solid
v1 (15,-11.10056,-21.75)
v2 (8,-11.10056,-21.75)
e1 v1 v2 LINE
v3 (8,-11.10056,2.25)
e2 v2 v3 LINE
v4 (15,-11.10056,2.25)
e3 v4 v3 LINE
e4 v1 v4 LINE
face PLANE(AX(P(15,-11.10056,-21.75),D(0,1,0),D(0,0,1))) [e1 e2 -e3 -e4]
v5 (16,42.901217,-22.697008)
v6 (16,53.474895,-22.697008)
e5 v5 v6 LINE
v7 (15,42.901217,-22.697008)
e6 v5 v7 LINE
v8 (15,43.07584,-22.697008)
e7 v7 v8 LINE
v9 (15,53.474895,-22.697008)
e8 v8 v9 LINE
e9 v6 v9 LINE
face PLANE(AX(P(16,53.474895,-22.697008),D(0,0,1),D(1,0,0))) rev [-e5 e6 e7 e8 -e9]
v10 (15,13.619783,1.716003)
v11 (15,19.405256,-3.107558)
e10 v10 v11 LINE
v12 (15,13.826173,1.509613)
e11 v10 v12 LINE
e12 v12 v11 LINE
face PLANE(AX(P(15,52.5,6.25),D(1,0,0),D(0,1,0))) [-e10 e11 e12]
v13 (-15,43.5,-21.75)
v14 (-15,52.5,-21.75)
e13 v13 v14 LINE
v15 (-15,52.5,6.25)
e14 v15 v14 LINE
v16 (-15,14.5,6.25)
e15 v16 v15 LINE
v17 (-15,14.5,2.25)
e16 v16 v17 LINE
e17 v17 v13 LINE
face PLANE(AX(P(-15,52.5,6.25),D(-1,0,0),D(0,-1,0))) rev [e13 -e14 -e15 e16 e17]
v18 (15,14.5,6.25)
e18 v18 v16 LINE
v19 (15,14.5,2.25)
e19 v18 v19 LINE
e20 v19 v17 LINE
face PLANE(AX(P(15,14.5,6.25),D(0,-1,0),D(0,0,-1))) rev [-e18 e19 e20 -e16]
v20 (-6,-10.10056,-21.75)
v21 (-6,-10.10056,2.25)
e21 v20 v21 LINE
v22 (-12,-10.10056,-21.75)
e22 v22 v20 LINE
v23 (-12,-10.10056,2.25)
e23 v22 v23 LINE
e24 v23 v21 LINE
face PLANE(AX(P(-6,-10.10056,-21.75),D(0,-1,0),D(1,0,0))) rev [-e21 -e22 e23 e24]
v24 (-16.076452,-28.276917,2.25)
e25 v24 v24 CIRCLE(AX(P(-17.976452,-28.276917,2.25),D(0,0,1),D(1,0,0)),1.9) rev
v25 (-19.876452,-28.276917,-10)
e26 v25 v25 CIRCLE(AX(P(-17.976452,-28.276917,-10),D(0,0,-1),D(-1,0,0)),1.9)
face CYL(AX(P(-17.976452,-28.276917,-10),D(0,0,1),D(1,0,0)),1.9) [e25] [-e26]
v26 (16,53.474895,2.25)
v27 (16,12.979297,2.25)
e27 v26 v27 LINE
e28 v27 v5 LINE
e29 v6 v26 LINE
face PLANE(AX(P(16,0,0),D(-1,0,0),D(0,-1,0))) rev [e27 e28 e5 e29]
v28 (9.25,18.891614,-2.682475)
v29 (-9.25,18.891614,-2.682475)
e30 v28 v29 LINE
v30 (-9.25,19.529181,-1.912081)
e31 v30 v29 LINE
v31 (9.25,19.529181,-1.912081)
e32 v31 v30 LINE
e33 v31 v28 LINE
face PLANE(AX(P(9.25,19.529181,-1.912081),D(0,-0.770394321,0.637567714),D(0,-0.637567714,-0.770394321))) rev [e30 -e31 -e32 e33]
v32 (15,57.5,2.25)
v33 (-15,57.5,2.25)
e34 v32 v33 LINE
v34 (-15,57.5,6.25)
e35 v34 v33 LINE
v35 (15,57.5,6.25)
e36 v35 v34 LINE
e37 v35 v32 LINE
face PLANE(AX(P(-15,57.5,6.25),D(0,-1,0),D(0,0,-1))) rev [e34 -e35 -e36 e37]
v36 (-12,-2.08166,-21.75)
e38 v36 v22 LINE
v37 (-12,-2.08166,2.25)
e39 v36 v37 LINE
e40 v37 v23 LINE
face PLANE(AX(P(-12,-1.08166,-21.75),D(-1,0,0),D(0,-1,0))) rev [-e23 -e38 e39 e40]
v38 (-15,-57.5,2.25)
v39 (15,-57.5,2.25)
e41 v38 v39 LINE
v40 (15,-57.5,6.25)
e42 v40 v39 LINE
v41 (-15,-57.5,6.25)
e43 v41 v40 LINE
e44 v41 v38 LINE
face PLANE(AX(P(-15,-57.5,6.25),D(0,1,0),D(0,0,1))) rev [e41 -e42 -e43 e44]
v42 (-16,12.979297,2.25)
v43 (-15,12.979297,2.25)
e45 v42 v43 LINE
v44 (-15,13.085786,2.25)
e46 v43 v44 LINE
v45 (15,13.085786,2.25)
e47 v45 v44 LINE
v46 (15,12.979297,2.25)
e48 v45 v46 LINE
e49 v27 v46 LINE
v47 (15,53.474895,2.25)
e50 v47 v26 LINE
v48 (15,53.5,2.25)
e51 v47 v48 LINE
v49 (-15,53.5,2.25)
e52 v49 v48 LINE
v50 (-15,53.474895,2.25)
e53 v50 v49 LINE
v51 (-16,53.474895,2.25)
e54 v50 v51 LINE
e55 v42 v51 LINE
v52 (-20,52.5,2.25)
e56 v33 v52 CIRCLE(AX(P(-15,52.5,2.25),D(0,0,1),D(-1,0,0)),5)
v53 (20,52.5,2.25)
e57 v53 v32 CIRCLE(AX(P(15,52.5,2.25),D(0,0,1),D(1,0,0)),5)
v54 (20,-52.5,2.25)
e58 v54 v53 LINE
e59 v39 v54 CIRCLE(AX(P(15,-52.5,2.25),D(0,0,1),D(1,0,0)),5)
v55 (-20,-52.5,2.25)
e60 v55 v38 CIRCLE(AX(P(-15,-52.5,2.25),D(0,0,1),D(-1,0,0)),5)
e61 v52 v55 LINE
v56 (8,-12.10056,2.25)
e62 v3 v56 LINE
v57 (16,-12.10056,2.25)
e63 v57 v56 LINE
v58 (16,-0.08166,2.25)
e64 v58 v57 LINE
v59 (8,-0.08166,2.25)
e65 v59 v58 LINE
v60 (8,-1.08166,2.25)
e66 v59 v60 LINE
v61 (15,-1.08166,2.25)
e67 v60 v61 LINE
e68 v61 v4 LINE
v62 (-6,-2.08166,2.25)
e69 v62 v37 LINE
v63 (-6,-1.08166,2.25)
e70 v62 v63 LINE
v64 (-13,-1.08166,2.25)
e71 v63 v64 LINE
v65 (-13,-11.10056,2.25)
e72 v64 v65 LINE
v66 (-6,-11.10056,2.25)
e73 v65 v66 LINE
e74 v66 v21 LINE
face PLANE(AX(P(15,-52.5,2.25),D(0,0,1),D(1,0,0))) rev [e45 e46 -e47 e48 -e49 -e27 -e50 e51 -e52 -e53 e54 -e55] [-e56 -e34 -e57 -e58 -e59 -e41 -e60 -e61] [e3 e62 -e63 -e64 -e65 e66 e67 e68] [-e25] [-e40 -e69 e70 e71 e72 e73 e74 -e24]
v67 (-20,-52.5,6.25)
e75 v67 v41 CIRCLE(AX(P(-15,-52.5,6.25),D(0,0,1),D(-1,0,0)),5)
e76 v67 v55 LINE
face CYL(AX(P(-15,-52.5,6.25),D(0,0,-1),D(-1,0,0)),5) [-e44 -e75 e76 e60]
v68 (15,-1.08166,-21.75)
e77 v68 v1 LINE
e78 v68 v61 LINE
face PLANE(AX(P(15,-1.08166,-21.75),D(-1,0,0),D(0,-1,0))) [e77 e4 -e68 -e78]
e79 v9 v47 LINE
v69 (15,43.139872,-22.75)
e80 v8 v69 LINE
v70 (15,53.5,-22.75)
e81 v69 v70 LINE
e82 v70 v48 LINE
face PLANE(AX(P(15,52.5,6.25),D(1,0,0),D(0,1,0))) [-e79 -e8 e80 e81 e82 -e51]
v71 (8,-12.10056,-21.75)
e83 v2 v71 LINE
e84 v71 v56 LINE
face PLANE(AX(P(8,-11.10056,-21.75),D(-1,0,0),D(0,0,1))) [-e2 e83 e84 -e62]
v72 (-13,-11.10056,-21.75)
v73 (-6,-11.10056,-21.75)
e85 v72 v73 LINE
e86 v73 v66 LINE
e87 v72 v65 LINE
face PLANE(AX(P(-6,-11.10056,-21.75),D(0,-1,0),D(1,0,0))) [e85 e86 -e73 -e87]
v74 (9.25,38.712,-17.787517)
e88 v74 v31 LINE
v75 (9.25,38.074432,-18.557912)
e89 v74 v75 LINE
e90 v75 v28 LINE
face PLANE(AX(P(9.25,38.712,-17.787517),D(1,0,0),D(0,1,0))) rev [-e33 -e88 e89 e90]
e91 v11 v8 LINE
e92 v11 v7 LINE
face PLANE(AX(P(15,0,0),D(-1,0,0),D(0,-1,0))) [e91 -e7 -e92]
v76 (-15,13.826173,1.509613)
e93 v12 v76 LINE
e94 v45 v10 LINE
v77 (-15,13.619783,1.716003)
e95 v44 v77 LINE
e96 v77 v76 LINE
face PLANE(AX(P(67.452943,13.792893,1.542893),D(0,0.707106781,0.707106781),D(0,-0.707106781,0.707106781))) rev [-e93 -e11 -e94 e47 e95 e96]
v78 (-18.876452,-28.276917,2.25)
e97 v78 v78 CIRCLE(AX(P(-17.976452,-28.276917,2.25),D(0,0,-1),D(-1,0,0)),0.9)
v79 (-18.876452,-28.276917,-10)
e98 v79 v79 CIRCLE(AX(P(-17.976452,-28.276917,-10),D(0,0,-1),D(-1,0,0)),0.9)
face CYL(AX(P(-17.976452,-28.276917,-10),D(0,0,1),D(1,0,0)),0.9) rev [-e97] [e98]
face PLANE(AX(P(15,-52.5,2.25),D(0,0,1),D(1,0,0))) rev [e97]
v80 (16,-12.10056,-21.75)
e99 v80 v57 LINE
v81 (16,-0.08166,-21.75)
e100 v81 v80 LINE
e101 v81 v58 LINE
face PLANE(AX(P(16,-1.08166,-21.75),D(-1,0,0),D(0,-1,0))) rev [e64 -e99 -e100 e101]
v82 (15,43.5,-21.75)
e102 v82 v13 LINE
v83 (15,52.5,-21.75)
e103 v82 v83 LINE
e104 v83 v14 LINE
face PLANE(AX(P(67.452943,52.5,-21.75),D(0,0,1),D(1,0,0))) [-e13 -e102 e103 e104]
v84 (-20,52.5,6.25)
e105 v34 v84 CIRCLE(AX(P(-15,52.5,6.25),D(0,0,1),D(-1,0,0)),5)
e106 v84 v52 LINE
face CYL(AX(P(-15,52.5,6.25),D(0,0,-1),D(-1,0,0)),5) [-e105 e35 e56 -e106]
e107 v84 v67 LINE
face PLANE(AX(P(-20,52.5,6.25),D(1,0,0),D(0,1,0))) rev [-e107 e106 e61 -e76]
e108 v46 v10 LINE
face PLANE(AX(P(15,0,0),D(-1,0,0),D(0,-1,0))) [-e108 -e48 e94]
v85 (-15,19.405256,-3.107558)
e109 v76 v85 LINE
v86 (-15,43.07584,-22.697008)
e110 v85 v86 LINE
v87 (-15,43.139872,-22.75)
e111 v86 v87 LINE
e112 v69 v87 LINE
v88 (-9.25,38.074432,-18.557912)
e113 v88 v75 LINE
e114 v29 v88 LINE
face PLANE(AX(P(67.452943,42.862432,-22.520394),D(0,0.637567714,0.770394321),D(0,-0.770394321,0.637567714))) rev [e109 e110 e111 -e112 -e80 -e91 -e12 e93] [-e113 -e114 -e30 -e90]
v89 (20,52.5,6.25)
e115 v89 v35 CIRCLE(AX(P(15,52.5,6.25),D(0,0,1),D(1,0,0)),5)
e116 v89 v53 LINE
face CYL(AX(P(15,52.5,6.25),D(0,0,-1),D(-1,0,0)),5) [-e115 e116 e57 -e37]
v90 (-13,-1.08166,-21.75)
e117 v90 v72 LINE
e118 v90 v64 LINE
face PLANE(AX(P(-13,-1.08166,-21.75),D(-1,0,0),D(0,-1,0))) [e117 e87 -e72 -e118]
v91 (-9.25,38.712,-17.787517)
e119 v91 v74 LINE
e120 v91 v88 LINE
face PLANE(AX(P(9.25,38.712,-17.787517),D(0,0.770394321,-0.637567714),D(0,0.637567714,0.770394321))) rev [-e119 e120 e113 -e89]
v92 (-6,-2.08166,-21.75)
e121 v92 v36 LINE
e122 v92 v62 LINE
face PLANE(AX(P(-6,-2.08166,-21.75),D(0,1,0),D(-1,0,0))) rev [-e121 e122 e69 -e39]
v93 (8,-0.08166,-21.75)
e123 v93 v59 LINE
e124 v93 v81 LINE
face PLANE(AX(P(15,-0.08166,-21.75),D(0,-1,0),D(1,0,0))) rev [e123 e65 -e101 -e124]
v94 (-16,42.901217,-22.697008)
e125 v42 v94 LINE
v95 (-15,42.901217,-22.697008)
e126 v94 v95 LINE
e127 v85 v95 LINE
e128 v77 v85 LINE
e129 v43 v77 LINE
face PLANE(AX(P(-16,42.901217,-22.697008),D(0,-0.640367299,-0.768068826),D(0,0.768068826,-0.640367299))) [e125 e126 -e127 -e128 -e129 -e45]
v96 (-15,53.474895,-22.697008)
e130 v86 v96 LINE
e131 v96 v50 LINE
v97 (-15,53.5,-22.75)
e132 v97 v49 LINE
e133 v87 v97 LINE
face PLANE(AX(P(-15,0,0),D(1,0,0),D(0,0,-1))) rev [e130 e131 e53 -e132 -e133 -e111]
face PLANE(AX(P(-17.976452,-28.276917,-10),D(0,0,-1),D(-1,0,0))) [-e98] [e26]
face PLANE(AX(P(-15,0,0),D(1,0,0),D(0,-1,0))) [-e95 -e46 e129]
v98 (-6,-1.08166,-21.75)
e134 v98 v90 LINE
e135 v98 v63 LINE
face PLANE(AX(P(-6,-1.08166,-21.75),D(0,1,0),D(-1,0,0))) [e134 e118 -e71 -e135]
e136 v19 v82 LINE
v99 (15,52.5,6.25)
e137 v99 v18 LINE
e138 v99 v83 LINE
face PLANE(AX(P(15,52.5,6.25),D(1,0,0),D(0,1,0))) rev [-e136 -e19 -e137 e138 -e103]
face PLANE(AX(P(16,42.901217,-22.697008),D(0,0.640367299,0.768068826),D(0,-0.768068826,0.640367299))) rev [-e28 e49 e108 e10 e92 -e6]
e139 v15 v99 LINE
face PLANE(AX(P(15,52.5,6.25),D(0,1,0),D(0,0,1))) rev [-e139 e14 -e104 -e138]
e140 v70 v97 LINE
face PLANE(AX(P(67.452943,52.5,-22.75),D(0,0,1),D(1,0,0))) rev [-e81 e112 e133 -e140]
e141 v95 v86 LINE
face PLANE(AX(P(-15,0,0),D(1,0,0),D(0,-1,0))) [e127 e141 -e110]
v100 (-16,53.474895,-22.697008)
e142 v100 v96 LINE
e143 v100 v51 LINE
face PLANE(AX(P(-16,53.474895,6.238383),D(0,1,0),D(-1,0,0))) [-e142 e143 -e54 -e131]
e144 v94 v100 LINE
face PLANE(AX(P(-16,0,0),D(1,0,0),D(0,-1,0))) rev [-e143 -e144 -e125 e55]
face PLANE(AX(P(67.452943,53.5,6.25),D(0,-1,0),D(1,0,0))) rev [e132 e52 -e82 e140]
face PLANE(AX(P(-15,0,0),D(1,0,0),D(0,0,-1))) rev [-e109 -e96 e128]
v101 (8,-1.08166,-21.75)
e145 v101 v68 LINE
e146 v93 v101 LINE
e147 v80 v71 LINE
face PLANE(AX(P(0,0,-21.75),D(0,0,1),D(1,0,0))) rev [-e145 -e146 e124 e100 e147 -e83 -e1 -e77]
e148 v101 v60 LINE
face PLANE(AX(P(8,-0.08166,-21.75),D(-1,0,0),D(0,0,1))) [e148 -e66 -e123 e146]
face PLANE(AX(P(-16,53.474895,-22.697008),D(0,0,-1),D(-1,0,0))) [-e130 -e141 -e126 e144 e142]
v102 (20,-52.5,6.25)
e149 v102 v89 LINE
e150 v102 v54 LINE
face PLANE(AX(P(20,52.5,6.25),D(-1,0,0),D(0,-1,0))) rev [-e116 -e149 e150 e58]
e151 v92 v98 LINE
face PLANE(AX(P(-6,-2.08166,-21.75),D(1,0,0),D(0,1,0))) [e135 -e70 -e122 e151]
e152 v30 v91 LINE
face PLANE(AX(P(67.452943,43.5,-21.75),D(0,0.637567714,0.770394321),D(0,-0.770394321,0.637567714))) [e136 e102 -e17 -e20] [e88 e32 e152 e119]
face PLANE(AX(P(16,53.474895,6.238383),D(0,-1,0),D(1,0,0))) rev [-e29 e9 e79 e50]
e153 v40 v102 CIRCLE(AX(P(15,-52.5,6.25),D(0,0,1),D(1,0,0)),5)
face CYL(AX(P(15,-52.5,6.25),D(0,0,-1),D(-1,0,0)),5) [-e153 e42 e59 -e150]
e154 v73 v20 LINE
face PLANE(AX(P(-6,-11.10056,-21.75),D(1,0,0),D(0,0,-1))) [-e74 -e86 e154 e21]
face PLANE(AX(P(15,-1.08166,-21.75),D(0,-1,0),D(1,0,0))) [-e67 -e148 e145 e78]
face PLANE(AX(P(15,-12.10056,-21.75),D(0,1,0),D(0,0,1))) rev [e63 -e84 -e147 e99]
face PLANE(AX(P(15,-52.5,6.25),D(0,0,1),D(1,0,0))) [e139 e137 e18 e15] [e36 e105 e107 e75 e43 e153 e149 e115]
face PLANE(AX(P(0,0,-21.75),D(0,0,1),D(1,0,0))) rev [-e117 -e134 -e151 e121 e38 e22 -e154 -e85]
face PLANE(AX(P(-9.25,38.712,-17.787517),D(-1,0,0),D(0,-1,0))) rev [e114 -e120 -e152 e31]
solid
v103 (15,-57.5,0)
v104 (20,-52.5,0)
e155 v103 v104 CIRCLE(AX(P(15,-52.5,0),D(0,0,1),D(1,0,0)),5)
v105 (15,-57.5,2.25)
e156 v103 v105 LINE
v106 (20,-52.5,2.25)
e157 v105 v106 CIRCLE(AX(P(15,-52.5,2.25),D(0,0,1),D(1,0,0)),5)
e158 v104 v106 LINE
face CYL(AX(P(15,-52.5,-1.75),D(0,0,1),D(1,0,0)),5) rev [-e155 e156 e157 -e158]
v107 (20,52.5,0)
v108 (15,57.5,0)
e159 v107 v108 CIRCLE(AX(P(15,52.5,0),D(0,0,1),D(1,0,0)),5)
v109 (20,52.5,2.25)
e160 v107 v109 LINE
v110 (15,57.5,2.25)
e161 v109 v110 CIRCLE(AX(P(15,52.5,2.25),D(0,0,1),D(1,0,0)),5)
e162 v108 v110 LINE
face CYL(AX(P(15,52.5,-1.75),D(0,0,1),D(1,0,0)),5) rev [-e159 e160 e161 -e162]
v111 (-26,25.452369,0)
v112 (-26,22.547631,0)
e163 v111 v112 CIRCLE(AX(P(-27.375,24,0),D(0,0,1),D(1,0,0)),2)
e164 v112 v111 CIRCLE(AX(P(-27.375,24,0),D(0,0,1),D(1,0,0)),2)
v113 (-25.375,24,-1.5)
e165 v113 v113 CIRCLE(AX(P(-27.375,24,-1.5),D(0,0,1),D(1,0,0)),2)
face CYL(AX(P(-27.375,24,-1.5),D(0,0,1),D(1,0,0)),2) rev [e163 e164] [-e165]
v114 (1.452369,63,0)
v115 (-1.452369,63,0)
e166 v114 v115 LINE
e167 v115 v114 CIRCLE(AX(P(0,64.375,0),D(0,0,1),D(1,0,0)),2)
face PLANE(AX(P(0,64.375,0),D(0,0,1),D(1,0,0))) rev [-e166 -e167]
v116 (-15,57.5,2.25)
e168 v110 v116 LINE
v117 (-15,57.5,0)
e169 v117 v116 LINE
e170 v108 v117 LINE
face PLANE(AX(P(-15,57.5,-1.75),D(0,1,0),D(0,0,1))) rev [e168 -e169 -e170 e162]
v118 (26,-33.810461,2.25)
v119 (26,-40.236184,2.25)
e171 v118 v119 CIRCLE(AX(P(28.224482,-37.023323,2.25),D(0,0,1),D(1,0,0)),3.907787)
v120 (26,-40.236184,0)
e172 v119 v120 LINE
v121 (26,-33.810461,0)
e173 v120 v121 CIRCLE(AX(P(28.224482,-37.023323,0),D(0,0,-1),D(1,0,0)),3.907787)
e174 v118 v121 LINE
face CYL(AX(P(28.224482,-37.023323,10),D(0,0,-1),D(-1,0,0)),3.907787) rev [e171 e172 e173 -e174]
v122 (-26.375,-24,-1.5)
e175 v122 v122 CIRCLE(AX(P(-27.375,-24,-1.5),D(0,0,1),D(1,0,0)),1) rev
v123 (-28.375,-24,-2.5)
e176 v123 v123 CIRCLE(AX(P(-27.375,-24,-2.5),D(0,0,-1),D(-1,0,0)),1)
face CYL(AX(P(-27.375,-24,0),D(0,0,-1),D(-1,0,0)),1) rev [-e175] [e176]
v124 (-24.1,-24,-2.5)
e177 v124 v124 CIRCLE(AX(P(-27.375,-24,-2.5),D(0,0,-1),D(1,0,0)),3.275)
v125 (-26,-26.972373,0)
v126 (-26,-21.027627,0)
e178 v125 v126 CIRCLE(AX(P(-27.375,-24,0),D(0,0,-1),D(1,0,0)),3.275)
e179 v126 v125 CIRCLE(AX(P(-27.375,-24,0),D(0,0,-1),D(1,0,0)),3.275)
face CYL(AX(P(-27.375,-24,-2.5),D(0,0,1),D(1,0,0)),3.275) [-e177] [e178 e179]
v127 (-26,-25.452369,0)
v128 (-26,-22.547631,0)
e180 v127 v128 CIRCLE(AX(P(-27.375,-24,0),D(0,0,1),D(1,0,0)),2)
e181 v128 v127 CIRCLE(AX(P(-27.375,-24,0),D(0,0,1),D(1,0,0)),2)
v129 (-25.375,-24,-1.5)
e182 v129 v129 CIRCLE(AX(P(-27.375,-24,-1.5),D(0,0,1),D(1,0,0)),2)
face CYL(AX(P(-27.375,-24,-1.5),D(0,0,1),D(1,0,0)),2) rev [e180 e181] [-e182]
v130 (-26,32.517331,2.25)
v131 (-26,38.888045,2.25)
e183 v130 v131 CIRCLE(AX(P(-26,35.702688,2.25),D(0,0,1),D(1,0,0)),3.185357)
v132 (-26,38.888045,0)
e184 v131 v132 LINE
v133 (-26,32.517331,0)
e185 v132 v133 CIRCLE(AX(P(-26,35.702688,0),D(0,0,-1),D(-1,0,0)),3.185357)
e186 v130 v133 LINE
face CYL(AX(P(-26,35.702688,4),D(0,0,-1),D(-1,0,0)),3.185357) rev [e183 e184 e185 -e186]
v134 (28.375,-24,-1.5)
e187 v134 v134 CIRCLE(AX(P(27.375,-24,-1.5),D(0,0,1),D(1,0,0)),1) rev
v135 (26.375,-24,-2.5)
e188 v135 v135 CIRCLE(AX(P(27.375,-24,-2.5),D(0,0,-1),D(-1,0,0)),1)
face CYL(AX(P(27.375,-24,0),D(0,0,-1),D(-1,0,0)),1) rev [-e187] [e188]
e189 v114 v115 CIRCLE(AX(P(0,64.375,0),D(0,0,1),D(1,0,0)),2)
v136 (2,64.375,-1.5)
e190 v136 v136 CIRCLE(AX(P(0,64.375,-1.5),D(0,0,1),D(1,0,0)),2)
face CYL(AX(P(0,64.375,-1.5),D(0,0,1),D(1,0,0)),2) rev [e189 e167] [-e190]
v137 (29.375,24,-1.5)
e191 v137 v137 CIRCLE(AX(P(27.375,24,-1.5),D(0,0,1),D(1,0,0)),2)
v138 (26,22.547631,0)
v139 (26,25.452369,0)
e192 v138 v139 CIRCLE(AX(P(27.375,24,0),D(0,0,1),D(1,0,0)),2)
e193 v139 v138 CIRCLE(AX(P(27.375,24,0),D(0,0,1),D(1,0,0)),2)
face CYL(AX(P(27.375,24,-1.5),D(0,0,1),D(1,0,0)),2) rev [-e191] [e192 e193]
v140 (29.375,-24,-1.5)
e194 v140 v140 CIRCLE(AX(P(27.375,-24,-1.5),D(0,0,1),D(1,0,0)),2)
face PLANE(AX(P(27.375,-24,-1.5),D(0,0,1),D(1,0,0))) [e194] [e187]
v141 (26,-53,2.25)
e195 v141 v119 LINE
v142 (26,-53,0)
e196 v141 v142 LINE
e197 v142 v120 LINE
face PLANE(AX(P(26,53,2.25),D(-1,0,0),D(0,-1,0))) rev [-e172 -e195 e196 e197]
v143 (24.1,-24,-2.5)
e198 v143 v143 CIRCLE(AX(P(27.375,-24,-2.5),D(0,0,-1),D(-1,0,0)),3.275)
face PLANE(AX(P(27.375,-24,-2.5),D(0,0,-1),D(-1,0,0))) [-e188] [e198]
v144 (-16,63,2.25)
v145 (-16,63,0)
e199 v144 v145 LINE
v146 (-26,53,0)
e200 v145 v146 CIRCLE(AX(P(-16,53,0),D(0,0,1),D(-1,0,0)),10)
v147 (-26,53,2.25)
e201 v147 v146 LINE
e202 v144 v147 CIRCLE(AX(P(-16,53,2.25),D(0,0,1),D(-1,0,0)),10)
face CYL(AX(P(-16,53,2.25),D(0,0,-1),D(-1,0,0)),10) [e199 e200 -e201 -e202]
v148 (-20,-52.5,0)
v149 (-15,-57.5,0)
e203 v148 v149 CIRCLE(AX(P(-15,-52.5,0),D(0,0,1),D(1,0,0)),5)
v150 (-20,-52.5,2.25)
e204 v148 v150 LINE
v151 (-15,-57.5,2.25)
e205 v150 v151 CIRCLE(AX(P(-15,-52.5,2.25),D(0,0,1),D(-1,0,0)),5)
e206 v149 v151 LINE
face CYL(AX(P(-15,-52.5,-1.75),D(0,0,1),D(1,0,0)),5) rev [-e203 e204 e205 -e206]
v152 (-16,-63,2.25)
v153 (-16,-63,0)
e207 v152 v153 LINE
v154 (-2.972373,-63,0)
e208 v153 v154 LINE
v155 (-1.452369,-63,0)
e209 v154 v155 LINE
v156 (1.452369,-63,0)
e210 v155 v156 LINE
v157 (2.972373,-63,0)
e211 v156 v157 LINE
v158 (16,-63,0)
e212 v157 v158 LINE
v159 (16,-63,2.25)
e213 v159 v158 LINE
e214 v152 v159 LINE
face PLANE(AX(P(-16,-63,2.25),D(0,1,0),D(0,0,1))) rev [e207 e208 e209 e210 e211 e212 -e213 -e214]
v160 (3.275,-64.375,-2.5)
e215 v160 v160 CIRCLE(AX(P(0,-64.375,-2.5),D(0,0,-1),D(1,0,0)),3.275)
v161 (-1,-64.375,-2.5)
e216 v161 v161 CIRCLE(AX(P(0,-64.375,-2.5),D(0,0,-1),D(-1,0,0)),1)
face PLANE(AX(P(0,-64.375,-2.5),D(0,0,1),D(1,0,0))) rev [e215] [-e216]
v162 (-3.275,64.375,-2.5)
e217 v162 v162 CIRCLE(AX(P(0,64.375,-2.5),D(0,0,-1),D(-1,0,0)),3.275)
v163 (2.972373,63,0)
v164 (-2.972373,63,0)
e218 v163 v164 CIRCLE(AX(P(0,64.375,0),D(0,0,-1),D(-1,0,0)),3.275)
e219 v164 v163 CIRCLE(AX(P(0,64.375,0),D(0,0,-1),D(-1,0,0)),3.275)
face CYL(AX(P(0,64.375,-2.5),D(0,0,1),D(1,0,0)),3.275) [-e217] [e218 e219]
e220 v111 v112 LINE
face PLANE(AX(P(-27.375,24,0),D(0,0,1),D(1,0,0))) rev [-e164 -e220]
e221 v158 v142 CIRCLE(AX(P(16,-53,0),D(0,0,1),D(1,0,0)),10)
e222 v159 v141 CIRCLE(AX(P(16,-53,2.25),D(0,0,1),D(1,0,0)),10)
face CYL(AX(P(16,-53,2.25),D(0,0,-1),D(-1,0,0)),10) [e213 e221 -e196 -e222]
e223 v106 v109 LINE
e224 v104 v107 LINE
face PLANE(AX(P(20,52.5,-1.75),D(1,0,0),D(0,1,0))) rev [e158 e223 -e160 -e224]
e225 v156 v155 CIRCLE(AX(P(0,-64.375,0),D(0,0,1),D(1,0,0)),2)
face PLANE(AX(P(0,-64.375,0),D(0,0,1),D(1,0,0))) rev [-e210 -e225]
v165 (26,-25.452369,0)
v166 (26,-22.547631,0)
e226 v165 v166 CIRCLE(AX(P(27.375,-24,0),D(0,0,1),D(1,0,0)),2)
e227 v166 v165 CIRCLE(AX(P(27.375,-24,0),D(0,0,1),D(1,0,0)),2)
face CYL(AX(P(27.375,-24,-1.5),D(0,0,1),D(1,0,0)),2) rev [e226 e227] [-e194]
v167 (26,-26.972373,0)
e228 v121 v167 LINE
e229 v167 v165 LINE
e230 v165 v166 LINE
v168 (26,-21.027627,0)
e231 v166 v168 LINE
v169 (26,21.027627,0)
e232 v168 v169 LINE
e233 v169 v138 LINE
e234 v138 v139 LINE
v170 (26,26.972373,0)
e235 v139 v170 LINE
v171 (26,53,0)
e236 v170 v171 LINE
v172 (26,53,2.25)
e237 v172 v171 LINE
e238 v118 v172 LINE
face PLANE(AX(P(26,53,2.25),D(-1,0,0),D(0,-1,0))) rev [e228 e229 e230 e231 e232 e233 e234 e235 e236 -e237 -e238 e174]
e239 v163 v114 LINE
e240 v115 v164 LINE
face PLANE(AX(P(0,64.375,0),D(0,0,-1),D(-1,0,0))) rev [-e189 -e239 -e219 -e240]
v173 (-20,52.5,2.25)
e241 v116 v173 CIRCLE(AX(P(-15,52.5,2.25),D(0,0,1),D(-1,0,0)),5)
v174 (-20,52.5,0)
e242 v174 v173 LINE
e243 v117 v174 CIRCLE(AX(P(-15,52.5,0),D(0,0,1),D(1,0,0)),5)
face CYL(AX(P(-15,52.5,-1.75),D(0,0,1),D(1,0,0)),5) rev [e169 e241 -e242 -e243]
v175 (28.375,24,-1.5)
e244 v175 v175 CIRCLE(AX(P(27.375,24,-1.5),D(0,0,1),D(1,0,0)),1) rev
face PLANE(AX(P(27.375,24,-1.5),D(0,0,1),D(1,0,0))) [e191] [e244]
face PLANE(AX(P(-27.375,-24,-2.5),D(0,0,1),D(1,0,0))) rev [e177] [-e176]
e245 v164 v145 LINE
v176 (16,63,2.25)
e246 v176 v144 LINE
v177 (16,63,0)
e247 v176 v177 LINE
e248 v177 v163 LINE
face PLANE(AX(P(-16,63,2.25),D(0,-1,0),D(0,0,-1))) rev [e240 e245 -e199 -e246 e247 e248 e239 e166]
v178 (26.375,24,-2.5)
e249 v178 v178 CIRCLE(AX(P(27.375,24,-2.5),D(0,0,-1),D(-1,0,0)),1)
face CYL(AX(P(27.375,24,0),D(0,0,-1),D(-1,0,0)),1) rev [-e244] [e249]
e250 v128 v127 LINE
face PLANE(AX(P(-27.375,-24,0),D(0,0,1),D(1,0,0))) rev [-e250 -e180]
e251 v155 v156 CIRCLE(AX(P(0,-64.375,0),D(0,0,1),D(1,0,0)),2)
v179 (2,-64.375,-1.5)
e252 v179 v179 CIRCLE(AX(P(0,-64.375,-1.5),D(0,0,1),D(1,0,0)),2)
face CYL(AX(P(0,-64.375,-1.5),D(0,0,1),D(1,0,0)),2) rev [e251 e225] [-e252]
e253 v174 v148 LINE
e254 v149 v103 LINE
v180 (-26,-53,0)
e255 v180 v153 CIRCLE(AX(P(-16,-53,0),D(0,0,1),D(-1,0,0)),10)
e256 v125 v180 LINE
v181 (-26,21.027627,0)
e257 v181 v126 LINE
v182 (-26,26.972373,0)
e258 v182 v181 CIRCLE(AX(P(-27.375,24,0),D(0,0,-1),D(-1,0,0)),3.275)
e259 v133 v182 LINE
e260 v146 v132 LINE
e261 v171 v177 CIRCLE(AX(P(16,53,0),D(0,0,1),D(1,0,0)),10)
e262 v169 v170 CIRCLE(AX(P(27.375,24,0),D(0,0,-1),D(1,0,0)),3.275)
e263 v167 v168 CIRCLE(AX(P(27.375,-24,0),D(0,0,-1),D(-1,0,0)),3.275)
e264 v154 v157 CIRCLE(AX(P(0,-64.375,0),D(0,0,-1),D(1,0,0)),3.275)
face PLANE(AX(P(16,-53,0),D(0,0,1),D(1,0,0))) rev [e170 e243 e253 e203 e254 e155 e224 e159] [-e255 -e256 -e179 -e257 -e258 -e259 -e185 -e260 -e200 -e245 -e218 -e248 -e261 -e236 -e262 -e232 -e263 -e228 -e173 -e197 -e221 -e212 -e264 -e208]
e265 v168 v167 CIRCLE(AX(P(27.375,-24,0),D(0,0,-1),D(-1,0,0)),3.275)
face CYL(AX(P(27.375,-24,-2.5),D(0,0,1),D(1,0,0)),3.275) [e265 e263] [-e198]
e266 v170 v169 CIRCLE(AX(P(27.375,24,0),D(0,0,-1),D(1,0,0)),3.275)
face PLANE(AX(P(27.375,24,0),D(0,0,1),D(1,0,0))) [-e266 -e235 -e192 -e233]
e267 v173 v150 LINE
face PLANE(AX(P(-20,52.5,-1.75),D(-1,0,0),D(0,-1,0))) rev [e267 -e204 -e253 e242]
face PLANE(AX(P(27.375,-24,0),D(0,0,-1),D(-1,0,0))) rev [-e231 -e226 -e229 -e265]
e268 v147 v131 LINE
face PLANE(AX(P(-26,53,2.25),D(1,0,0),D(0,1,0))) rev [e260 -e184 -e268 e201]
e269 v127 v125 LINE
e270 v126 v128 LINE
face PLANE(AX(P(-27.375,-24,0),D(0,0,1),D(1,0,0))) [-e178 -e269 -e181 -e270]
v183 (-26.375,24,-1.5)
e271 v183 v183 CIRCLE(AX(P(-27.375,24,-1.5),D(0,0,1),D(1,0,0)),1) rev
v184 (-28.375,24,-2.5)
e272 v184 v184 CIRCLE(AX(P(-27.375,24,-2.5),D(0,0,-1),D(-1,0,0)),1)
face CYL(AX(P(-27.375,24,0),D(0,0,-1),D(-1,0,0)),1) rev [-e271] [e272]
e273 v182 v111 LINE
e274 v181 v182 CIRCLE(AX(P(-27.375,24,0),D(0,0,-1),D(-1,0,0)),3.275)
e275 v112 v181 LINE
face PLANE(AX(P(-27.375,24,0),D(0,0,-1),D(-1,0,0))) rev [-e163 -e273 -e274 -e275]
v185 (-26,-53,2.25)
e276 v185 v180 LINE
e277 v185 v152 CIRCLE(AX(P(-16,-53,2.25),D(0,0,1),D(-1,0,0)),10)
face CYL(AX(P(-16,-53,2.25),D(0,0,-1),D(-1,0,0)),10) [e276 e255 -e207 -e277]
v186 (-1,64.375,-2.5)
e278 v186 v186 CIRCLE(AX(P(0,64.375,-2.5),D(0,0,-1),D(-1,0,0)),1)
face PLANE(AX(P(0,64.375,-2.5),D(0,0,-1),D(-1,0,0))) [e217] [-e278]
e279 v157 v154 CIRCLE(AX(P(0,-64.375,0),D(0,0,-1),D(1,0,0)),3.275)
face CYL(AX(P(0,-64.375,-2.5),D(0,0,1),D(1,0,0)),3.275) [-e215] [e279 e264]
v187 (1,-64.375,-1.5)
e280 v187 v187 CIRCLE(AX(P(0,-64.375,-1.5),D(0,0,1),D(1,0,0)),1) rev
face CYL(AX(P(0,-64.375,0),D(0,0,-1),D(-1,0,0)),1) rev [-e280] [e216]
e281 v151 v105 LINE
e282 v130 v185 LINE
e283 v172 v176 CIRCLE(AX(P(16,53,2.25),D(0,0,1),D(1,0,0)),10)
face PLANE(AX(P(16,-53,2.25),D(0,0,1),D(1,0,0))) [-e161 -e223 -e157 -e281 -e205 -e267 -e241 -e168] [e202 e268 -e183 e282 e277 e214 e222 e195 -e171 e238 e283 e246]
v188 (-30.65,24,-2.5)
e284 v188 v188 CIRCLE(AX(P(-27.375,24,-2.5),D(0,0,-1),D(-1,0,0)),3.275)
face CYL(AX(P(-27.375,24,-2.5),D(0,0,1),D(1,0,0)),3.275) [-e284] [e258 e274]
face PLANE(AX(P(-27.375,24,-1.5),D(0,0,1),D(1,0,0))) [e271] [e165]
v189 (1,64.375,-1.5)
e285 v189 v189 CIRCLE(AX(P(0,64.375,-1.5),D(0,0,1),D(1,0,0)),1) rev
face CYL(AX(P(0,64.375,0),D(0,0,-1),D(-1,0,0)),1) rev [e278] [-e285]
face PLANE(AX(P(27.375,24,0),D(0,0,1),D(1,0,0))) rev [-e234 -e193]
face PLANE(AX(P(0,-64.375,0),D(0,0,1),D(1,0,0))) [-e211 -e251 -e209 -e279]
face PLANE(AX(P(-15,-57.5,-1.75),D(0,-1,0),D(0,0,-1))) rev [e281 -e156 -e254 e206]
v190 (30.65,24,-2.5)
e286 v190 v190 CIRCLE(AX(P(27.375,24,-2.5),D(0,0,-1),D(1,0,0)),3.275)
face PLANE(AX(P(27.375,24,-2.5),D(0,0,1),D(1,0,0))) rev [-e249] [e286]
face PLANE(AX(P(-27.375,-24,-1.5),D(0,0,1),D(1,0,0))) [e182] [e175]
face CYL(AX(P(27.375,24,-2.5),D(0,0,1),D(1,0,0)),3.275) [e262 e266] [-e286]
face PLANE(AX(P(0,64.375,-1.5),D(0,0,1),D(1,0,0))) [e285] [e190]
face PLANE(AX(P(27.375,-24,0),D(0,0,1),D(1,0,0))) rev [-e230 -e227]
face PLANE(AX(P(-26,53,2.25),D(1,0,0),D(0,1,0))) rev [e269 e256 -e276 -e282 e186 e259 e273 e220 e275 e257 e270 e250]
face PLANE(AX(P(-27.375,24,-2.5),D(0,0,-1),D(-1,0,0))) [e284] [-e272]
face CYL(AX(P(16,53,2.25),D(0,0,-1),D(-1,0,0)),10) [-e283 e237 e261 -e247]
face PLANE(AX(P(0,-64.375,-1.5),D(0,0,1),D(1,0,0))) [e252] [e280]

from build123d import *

# Parameters (mm, degrees)
BOSS_EXTRUDE1_DEPTH = 2.25
BOSS_EXTRUDE2_DEPTH = 4
CUT_EXTRUDE1_START  = -4
CUT_EXTRUDE1_DEPTH  = 4
SKETCH4_W           = 30
SKETCH4_H           = 38
CUT_EXTRUDE2_DEPTH  = 4
EXTRUDE_THIN2_DEPTH = 30
BOSS_EXTRUDE4_DEPTH = 1
SKETCH8_W           = 18.5
SKETCH8_H           = 24.9
CUT_EXTRUDE3_DEPTH  = 1
EXTRUDE_THIN3_DEPTH = 24
SKETCH10_R          = 3.275
BOSS_EXTRUDE5_DEPTH = 2.5
SKETCH11_R          = 1
CUT_EXTRUDE5_DEPTH  = 2.5
SKETCH12_R          = 2
CUT_EXTRUDE6_DEPTH  = 1.5
CUT_EXTRUDE7_DEPTH  = 4
CUT_EXTRUDE8_DEPTH  = 10
SKETCH17_R          = 1.9
SKETCH17_R_2        = 0.9
EXTRUDE_THIN4_DEPTH = 12.25


# Read off the part's stored shape, not the designer's step: Extrude-Thin3
with BuildPart() as part:
    # Sketch1 → Boss-Extrude1 (new body)
    with BuildSketch(Plane.XY):
        with BuildLine():
            Line((-16, 63), (16, 63))
            ThreePointArc((16, 63), (23.071067812, 60.071067812), (26, 53))
            Line((26, 53), (26, -53))
            ThreePointArc((26, -53), (23.071067812, -60.071067812), (16, -63))
            Line((16, -63), (-16, -63))
            ThreePointArc((-16, -63), (-23.071067812, -60.071067812), (-26, -53))
            Line((-26, -53), (-26, 53))
            ThreePointArc((-26, 53), (-23.071067812, 60.071067812), (-16, 63))
        make_face()
    extrude(amount=BOSS_EXTRUDE1_DEPTH)

    # Sketch2 → Boss-Extrude2 (add)
    with BuildSketch(Plane.XY.offset(2.25)):
        with BuildLine():
            Line((-15, 57.5), (15, 57.5))
            ThreePointArc((15, 57.5), (18.535533906, 56.035533906), (20, 52.5))
            Line((20, 52.5), (20, -52.5))
            ThreePointArc((20, -52.5), (18.535533906, -56.035533906), (15, -57.5))
            Line((15, -57.5), (-15, -57.5))
            ThreePointArc((-15, -57.5), (-18.535533906, -56.035533906), (-20, -52.5))
            Line((-20, -52.5), (-20, 52.5))
            ThreePointArc((-20, 52.5), (-18.535533906, 56.035533906), (-15, 57.5))
        make_face()
    extrude(amount=BOSS_EXTRUDE2_DEPTH)

    # Sketch2<2> → Cut-Extrude1 (cut)
    with BuildSketch(Plane.XY.offset(2.25).offset(CUT_EXTRUDE1_START)):
        with BuildLine():
            Line((-15, 57.5), (15, 57.5))
            ThreePointArc((15, 57.5), (18.535533906, 56.035533906), (20, 52.5))
            Line((20, 52.5), (20, -52.5))
            ThreePointArc((20, -52.5), (18.535533906, -56.035533906), (15, -57.5))
            Line((15, -57.5), (-15, -57.5))
            ThreePointArc((-15, -57.5), (-18.535533906, -56.035533906), (-20, -52.5))
            Line((-20, -52.5), (-20, 52.5))
            ThreePointArc((-20, 52.5), (-18.535533906, 56.035533906), (-15, 57.5))
        make_face()
    extrude(amount=CUT_EXTRUDE1_DEPTH, mode=Mode.SUBTRACT)


with BuildPart() as cut_extrude1_piece_1:
    # of the separate pieces the step leaves, piece 1, a body of its own (cut_extrude1_pieces)
    add(part.part.solids().sort_by_distance((-15, 57.5, 6.25))[0])

    # Sketch4 → Cut-Extrude2 (cut)
    with BuildSketch(Plane(origin=(0, 0, 2.25), x_dir=(-1, 0, 0), z_dir=(0, 0, -1))):
        with Locations((0, 33.5)):
            Rectangle(SKETCH4_W, SKETCH4_H)
    extrude(amount=-CUT_EXTRUDE2_DEPTH, mode=Mode.SUBTRACT)

    # Sketch5 → Extrude-Thin2 (add)
    with BuildSketch(Plane(origin=(-15, 0, 0), x_dir=(0, 0, -1), z_dir=(1, 0, 0))):
        Polygon((-6.25, 52.5), (21.75, 52.5), (21.75, 43.5), (-2.25, 14.5), (-6.25, 10.5), (-5.542893219, 9.792893219), (-1.50961301, 13.826173428), (22.75, 43.139872481), (22.75, 53.5), (-6.25, 53.5), align=None)
    extrude(amount=EXTRUDE_THIN2_DEPTH)

    # Sketch7 → Boss-Extrude4 (add)
    with BuildSketch(Plane(origin=(15, 0, 0), x_dir=(0, 0, -1), z_dir=(1, 0, 0))):
        Polygon((-6.238382976, 53.474895441), (22.697007931, 53.474895441), (22.697007931, 42.901217194), (-2.25, 12.979297204), (-6.238382976, 12.979297204), align=None)
    boss_extrude4 = extrude(amount=BOSS_EXTRUDE4_DEPTH)

    # Mirror1: Boss-Extrude4 across plane
    add(boss_extrude4.mirror(Plane(origin=(0, 0, 0), x_dir=(0, 0, 1), z_dir=(1, 0, 0))))

    # Sketch8 → Cut-Extrude3 (cut)
    with BuildSketch(Plane(origin=(0, 6.36172657, 7.687086272), x_dir=(-1, 0, 0), z_dir=(0, -0.6375677140342259, -0.77039432112469))):
        with Locations((0, 28.714251622)):
            Rectangle(SKETCH8_W, SKETCH8_H)
    extrude(amount=-CUT_EXTRUDE3_DEPTH, mode=Mode.SUBTRACT)

    # Extrude-Thin3 outline → Extrude-Thin3 (add)
    with BuildSketch(Plane(origin=(0, 0, 2.25), x_dir=(-1, 0, 0), z_dir=(0, 0, -1))):
        Polygon((-8, -11.100560231), (-15, -11.100560231), (-15, -1.081660237), (-8, -1.081660237), (-8, -0.081660237), (-16, -0.081660237), (-16, -12.100560231), (-8, -12.100560231), align=None)
        Polygon((12, -10.100560231), (6, -10.100560231), (6, -11.100560231), (13, -11.100560231), (13, -1.081660237), (6, -1.081660237), (6, -2.081660237), (12, -2.081660237), align=None)
    extrude(amount=EXTRUDE_THIN3_DEPTH)

    # Sketch17 → Extrude-Thin4 (add)
    with BuildSketch(Plane(origin=(0, 0, 2.25), x_dir=(-1, 0, 0), z_dir=(0, 0, -1))):
        with Locations((17.976451786, -28.276917351)):
            Circle(SKETCH17_R)
        with Locations((17.976451786, -28.276917351)):
            Circle(SKETCH17_R_2, mode=Mode.SUBTRACT)
    extrude(amount=EXTRUDE_THIN4_DEPTH)


with BuildPart() as cut_extrude1_piece_2:
    # of the separate pieces the step leaves, piece 2, a body of its own (cut_extrude1_pieces)
    add(part.part.solids().sort_by_distance((-26, 53, 0))[0])

    # Sketch10 → Boss-Extrude5 (add)
    with BuildSketch(Plane(origin=(0, 0, 0), x_dir=(-1, 0, 0), z_dir=(0, 0, -1))):
        with Locations(Location((0, 64.375, 0), (0, 0, 204.824949061))):
            Circle(SKETCH10_R)
        with Locations(Location((0, -64.375, 0), (0, 0, 180))):
            Circle(SKETCH10_R)
        with Locations(Location((27.375, 24, 0), (0, 0, 114.824949061))):
            Circle(SKETCH10_R)
        with Locations(Location((27.375, -24, 0), (0, 0, 180))):
            Circle(SKETCH10_R)
        with Locations(Location((-27.375, -24, 0), (0, 0, 294.824949061))):
            Circle(SKETCH10_R)
        with Locations(Location((-27.375, 24, 0), (0, 0, 180))):
            Circle(SKETCH10_R)
    extrude(amount=BOSS_EXTRUDE5_DEPTH)

    # Sketch11 → Cut-Extrude5 (cut)
    with BuildSketch(Plane(origin=(0, 0, -2.5), x_dir=(-1, 0, 0), z_dir=(0, 0, -1))):
        with Locations((0, 64.375)):
            Circle(SKETCH11_R)
        with Locations((-27.375, 24)):
            Circle(SKETCH11_R)
        with Locations((27.375, 24)):
            Circle(SKETCH11_R)
        with Locations((27.375, -24)):
            Circle(SKETCH11_R)
        with Locations((-27.375, -24)):
            Circle(SKETCH11_R)
        with Locations((0, -64.375)):
            Circle(SKETCH11_R)
    extrude(amount=-CUT_EXTRUDE5_DEPTH, mode=Mode.SUBTRACT)

    # Sketch12 → Cut-Extrude6 (cut)
    with BuildSketch(Plane.XY):
        with Locations((0, 64.375)):
            Circle(SKETCH12_R)
        with Locations((-27.375, 24)):
            Circle(SKETCH12_R)
        with Locations((27.375, 24)):
            Circle(SKETCH12_R)
        with Locations((27.375, -24)):
            Circle(SKETCH12_R)
        with Locations((-27.375, -24)):
            Circle(SKETCH12_R)
        with Locations((0, -64.375)):
            Circle(SKETCH12_R)
    extrude(amount=-CUT_EXTRUDE6_DEPTH, mode=Mode.SUBTRACT)

    # Sketch15 → Cut-Extrude7 (cut)
    with BuildSketch(Plane(origin=(0, 0, 0), x_dir=(-1, 0, 0), z_dir=(0, 0, -1))):
        with BuildLine():
            Line((26, 38.888045201), (26, 32.517331246))
            ThreePointArc((26, 32.517331246), (22.814643022, 35.702688223), (26, 38.888045201))
        make_face()
    extrude(amount=-CUT_EXTRUDE7_DEPTH, mode=Mode.SUBTRACT)

    # Sketch16 → Cut-Extrude8 (cut)
    with BuildSketch(Plane(origin=(0, 0, 0), x_dir=(-1, 0, 0), z_dir=(0, 0, -1))):
        with BuildLine():
            Line((-26, -40.236184249), (-26, -33.902444759))
            Line((-26, -33.902444759), (-26, -33.81046099))
            ThreePointArc((-26, -33.81046099), (-24.316694811, -37.023322619), (-26, -40.236184249))
        make_face()
    extrude(amount=-CUT_EXTRUDE8_DEPTH, mode=Mode.SUBTRACT)


solid = Compound([cut_extrude1_piece_1.part, cut_extrude1_piece_2.part])
